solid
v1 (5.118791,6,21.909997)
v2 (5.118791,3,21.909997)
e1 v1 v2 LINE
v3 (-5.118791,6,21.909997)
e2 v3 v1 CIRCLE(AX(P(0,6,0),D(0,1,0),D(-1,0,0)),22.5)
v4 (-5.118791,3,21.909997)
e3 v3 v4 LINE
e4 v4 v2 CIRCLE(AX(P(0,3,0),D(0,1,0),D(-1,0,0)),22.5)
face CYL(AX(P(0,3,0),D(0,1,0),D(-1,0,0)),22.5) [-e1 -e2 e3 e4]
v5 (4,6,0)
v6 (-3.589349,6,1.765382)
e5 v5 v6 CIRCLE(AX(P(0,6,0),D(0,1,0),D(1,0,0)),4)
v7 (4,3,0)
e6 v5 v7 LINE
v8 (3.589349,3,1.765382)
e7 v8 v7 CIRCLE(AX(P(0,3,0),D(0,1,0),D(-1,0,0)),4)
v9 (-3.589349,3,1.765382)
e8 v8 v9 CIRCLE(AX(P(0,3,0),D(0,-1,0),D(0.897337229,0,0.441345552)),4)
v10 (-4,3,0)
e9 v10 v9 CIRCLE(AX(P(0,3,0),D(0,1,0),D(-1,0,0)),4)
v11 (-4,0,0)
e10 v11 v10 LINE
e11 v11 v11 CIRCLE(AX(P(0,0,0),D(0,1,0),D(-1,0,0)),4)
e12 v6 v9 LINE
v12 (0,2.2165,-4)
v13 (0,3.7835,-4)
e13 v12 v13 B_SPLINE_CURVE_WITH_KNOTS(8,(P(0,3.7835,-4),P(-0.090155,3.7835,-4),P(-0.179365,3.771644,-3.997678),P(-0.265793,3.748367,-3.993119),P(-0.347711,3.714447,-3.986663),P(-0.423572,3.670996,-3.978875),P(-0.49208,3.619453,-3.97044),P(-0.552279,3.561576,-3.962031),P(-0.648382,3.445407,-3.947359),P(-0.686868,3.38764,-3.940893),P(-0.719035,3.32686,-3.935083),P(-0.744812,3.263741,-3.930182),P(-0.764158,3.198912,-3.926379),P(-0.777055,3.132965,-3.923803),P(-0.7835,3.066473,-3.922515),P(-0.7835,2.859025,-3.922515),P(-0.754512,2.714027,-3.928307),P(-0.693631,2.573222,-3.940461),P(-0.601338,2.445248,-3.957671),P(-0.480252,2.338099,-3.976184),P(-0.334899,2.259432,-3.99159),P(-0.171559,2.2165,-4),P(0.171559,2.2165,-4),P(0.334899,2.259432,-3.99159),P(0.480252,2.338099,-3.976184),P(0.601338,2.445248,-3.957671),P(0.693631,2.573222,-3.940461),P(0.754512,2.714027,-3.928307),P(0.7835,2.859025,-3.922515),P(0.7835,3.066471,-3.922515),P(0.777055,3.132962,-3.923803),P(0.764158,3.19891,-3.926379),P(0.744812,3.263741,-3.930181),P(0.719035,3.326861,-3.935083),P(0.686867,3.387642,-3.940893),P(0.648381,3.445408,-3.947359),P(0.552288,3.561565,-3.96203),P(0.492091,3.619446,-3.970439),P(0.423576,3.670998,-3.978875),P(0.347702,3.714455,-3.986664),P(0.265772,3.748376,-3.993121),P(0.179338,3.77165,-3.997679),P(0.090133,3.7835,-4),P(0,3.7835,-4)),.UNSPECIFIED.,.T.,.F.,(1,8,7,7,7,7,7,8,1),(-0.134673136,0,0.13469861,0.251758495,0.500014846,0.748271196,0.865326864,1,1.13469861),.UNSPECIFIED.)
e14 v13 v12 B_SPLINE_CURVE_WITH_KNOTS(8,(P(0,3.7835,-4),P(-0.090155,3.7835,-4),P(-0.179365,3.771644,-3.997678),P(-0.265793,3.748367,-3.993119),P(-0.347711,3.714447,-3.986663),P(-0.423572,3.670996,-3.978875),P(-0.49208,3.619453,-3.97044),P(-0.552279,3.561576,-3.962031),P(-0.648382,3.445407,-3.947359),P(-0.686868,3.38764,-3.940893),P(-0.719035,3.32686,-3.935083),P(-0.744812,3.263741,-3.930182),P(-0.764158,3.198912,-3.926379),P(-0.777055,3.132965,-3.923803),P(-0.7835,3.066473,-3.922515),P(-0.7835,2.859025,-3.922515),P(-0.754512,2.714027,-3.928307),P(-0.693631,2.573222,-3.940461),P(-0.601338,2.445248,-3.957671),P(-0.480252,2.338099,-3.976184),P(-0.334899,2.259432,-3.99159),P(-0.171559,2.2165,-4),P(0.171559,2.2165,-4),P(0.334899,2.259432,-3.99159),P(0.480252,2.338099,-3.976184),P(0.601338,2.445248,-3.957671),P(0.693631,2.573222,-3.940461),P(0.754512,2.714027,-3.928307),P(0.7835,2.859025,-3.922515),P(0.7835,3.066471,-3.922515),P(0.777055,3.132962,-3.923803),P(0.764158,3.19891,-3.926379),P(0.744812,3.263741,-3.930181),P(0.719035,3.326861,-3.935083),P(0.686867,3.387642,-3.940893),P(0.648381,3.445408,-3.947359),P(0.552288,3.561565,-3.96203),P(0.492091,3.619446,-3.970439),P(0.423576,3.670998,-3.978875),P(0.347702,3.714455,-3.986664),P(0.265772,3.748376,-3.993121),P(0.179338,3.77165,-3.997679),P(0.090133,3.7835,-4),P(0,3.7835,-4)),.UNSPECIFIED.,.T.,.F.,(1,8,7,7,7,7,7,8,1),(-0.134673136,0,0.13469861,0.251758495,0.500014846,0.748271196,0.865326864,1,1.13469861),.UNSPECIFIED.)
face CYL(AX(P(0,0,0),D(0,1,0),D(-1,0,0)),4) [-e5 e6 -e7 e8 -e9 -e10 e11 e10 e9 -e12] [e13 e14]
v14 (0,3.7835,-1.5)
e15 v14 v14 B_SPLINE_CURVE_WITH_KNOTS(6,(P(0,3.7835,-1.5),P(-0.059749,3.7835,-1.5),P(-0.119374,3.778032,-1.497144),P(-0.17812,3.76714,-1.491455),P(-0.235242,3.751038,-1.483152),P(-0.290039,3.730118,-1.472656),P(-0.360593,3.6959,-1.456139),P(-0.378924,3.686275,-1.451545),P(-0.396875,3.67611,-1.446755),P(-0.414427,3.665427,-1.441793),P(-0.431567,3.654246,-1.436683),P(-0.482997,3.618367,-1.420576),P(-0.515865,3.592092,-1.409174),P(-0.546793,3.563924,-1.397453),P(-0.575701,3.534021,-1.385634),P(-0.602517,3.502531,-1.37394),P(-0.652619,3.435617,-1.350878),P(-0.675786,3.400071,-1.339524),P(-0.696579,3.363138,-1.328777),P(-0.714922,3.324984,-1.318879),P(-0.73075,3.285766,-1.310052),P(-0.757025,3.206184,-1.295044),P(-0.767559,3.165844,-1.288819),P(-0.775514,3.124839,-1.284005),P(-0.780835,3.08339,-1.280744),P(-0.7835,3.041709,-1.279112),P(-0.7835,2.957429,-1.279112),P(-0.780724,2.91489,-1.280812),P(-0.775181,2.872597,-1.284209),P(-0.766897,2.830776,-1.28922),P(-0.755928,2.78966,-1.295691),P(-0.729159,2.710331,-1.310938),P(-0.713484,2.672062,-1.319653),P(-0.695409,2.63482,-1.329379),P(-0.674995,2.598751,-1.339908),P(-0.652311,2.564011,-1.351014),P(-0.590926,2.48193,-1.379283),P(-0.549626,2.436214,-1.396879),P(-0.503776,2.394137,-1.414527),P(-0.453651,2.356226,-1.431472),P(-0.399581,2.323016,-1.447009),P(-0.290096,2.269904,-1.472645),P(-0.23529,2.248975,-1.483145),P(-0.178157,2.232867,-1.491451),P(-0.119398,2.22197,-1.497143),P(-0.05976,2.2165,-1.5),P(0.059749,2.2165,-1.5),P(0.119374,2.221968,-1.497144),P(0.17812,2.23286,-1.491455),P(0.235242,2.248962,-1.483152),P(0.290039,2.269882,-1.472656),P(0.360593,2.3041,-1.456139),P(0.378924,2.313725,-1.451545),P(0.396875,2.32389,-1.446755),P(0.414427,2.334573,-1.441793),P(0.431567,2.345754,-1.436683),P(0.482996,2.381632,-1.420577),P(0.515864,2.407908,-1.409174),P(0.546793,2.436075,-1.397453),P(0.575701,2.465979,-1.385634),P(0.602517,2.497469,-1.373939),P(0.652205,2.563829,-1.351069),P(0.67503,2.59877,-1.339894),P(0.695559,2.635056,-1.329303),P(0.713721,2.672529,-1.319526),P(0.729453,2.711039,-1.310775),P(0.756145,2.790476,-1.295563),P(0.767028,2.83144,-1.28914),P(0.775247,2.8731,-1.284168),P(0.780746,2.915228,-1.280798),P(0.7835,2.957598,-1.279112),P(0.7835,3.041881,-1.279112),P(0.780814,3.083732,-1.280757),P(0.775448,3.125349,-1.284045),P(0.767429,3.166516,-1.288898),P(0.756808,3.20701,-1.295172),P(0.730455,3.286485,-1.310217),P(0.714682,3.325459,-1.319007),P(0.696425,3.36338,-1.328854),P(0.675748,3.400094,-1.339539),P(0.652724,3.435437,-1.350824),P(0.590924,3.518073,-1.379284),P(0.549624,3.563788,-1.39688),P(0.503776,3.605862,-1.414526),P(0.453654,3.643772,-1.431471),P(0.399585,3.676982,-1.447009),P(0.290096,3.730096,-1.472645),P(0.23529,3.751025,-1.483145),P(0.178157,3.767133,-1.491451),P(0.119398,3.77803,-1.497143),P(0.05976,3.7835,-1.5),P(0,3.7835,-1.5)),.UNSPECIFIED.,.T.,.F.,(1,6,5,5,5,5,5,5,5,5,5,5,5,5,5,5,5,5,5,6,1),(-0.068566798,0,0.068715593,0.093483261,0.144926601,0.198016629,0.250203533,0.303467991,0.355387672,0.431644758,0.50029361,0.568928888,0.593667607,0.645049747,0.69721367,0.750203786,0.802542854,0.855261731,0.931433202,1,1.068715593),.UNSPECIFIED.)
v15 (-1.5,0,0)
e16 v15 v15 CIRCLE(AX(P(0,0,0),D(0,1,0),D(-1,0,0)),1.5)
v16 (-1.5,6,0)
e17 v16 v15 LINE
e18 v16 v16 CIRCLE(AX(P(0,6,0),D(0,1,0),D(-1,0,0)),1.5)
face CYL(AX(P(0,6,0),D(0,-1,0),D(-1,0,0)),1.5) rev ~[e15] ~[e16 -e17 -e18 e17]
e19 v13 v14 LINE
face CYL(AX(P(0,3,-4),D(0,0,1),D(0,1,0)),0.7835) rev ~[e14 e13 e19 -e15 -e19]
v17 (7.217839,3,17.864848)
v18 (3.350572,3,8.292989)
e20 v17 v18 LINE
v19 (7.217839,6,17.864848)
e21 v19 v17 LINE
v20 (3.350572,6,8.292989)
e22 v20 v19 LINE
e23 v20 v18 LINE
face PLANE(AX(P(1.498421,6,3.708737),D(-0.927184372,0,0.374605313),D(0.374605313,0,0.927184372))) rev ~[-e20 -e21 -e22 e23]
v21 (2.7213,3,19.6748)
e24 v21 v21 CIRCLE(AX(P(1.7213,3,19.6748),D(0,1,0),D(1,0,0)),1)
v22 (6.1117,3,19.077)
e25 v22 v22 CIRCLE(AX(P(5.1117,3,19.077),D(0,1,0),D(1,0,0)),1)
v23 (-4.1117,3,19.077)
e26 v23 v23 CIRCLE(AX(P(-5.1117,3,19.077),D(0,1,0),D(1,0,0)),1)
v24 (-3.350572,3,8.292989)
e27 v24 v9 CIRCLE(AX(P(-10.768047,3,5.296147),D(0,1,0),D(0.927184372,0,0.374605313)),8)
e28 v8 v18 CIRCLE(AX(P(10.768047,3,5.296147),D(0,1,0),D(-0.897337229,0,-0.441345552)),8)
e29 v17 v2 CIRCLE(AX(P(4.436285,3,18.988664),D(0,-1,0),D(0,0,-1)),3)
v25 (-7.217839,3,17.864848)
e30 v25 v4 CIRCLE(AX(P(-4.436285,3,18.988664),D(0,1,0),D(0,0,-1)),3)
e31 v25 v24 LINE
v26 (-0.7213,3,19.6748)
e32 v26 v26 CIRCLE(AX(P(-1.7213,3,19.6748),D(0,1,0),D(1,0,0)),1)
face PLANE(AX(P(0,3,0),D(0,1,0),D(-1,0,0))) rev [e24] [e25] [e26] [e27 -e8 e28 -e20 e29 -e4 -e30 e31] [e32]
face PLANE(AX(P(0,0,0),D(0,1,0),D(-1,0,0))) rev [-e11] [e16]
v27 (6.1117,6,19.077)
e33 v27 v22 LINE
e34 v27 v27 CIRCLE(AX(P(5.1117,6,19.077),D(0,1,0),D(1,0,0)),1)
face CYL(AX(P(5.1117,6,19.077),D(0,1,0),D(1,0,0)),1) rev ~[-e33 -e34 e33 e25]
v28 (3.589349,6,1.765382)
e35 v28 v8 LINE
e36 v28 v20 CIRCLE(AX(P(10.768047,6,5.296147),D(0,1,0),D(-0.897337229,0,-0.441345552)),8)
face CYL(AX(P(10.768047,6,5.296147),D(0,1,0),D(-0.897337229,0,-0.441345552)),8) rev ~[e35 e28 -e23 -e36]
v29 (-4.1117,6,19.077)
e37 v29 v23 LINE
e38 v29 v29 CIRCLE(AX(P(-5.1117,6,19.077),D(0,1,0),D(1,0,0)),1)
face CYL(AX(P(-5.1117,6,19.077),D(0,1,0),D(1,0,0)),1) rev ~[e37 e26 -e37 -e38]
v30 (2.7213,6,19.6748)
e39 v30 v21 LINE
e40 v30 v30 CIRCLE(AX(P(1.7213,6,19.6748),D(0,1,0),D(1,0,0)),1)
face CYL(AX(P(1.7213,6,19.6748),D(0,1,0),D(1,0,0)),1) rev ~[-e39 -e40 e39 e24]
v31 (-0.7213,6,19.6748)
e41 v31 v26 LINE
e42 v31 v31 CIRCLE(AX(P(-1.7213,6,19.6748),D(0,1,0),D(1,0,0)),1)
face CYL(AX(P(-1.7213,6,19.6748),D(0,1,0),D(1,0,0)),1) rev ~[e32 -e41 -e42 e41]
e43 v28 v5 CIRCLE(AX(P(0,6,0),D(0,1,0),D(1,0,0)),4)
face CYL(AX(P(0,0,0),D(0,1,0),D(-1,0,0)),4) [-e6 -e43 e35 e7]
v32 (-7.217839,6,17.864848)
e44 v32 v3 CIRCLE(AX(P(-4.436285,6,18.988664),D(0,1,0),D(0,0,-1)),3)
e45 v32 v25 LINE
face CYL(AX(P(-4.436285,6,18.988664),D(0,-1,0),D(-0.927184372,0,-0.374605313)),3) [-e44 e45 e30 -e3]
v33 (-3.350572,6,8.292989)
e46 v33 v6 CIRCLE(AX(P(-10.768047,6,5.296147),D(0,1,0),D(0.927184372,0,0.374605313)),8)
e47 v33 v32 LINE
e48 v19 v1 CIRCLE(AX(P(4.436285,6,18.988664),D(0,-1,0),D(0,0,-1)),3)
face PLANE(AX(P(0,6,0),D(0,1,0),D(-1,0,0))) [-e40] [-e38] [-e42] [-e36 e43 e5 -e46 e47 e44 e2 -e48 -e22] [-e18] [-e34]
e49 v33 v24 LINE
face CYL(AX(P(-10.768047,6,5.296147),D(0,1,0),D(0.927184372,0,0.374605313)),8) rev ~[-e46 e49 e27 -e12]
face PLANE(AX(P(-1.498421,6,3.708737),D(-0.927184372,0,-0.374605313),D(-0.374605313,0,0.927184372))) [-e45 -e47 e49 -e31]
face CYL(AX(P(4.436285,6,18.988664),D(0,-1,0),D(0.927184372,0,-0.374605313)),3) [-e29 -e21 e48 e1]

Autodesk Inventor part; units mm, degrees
ref_plane "YZ Plane" through (0, 0, 0) normal (1, 0, 0) x (0, 1, 0)
ref_plane "XZ Plane" through (0, 0, 0) normal (0, 1, 0) x (-1, 0, 0)
sketch "Sketch11" plane through (0, 0, 0) normal (0, 0, 1) x (1, 0, 0)
  line L0 (0, 0) -> (0, 6)
  line L1 (-4, 0) -> (-4, 3)
  line L2 (-4, 3) -> (-22.5, 3)
  line L3 (-22.5, 3) -> (-22.5, 6)
  line L4 (-22.5, 6) -> (-1.5, 6)
  line L5 (-1.5, 6) -> (-1.5, 0)
  line L6 (-1.5, 0) -> (-4, 0)
  dimension "d59" = 3
  dimension "d60" = 6
  dimension "d61" = 3
  dimension "d62" = 45
  dimension "d63" = 2.5
revolve "Revolution3" add sketch "Sketch11" angle 360 about axis through (0, 0, 0) along (0, 1, 0)
sketch "Sketch12" plane through (0, 6, 0) normal (0, 1, 0) x (1, 0, 0)
  circle A0 centre (1.7213, -19.6748) radius 1
  circle A1 centre (-1.7213, -19.6748) radius 1
  circle A2 centre (-5.1117, -19.077) radius 1
  circle A3 centre (5.1117, -19.077) radius 1
  circle A4 centre (0, 0) radius 19.75 construction
  line L0 (0, 0) -> (0, -19.75) construction
  line L1 (0, 0) -> (-1.7213, -19.6748) construction
  line L2 (0, 0) -> (-5.1117, -19.077) construction
  line L3 (0, 0) -> (1.7213, -19.6748) construction
  line L4 (0, 0) -> (5.1117, -19.077) construction
  line L5 (-5.1117, -19.077) -> (-1.7213, -19.6748) construction
  line L6 (-1.7213, -19.6748) -> (1.7213, -19.6748) construction
  dimension "d65" = 2
  dimension "d66" = 2
  dimension "d67" = 2
  dimension "d68" = 2
  dimension "d71" = 5
  dimension "d72" = 10
  dimension "d73" = 10
  dimension "d81" = 39.5
  dimension "d90" = 10.2233
extrude "Extrusion7" cut sketch "Sketch12" against normal through all
sketch "Sketch14" plane through (0, 6, 0) normal (0, 1, 0) x (1, 0, 0)
  circle A0 centre (0, 0) radius 22.5 projected
  line L0 (0, 0) -> (0, -22.5)
  line L1 (0, 0) -> (-8.4286, -20.8616)
  line L2 (0, 0) -> (8.4286, -20.8616)
  circle A1 centre (0, 0) radius 4 projected
  point P0 (1.4984, -3.7087)
  point P1 (-1.4984, -3.7087)
  dimension "d76" = 22
  dimension "d77" = 22
extrude "Extrusion8" cut sketch "Sketch14" against normal through all contours A0 L2 A1 L1
fillet "Fillet3" radius 3 2 edges at (8.4286, 4.5, 20.8616) (-8.4286, 4.5, 20.8616)
fillet "Fillet4" radius 8 2 edges at (1.4984, 4.5, 3.7087) (-1.4984, 4.5, 3.7087)
ref_plane "Work Plane2" through (0, 1.5, -4) normal (0, 0, 1) x (1, 0, 0)
sketch "Sketch15" plane through (0, 1.5, -4) normal (0, 0, 1) x (1, 0, 0)
  line L0 (4, 4.5) -> (-4, 4.5) projected
  line L1 (4, -1.5) -> (4, 4.5) projected
  point P0 (0, -1.5)
  point P1 (0, 1.5)
  point P2 (3.5894, 4.5)
  point P3 (-3.5894, 4.5)
  point P4 (0, 4.5)
  point P5 (4, 1.5)
hole "Hole3" at (0, 3, -4) direction (0, 0, 1) diameter 1.567 depth 4.5 tip angle 118 thread size "M2x0.4" class "6H" standard "ISO Metric profile"
equation "\"d71\" = 0.5 * d72"
equation "\"d73\" = d72"
equation "\"d77\" = d76"
properties part number "023" material "Stainless Steel, Austenitic"
